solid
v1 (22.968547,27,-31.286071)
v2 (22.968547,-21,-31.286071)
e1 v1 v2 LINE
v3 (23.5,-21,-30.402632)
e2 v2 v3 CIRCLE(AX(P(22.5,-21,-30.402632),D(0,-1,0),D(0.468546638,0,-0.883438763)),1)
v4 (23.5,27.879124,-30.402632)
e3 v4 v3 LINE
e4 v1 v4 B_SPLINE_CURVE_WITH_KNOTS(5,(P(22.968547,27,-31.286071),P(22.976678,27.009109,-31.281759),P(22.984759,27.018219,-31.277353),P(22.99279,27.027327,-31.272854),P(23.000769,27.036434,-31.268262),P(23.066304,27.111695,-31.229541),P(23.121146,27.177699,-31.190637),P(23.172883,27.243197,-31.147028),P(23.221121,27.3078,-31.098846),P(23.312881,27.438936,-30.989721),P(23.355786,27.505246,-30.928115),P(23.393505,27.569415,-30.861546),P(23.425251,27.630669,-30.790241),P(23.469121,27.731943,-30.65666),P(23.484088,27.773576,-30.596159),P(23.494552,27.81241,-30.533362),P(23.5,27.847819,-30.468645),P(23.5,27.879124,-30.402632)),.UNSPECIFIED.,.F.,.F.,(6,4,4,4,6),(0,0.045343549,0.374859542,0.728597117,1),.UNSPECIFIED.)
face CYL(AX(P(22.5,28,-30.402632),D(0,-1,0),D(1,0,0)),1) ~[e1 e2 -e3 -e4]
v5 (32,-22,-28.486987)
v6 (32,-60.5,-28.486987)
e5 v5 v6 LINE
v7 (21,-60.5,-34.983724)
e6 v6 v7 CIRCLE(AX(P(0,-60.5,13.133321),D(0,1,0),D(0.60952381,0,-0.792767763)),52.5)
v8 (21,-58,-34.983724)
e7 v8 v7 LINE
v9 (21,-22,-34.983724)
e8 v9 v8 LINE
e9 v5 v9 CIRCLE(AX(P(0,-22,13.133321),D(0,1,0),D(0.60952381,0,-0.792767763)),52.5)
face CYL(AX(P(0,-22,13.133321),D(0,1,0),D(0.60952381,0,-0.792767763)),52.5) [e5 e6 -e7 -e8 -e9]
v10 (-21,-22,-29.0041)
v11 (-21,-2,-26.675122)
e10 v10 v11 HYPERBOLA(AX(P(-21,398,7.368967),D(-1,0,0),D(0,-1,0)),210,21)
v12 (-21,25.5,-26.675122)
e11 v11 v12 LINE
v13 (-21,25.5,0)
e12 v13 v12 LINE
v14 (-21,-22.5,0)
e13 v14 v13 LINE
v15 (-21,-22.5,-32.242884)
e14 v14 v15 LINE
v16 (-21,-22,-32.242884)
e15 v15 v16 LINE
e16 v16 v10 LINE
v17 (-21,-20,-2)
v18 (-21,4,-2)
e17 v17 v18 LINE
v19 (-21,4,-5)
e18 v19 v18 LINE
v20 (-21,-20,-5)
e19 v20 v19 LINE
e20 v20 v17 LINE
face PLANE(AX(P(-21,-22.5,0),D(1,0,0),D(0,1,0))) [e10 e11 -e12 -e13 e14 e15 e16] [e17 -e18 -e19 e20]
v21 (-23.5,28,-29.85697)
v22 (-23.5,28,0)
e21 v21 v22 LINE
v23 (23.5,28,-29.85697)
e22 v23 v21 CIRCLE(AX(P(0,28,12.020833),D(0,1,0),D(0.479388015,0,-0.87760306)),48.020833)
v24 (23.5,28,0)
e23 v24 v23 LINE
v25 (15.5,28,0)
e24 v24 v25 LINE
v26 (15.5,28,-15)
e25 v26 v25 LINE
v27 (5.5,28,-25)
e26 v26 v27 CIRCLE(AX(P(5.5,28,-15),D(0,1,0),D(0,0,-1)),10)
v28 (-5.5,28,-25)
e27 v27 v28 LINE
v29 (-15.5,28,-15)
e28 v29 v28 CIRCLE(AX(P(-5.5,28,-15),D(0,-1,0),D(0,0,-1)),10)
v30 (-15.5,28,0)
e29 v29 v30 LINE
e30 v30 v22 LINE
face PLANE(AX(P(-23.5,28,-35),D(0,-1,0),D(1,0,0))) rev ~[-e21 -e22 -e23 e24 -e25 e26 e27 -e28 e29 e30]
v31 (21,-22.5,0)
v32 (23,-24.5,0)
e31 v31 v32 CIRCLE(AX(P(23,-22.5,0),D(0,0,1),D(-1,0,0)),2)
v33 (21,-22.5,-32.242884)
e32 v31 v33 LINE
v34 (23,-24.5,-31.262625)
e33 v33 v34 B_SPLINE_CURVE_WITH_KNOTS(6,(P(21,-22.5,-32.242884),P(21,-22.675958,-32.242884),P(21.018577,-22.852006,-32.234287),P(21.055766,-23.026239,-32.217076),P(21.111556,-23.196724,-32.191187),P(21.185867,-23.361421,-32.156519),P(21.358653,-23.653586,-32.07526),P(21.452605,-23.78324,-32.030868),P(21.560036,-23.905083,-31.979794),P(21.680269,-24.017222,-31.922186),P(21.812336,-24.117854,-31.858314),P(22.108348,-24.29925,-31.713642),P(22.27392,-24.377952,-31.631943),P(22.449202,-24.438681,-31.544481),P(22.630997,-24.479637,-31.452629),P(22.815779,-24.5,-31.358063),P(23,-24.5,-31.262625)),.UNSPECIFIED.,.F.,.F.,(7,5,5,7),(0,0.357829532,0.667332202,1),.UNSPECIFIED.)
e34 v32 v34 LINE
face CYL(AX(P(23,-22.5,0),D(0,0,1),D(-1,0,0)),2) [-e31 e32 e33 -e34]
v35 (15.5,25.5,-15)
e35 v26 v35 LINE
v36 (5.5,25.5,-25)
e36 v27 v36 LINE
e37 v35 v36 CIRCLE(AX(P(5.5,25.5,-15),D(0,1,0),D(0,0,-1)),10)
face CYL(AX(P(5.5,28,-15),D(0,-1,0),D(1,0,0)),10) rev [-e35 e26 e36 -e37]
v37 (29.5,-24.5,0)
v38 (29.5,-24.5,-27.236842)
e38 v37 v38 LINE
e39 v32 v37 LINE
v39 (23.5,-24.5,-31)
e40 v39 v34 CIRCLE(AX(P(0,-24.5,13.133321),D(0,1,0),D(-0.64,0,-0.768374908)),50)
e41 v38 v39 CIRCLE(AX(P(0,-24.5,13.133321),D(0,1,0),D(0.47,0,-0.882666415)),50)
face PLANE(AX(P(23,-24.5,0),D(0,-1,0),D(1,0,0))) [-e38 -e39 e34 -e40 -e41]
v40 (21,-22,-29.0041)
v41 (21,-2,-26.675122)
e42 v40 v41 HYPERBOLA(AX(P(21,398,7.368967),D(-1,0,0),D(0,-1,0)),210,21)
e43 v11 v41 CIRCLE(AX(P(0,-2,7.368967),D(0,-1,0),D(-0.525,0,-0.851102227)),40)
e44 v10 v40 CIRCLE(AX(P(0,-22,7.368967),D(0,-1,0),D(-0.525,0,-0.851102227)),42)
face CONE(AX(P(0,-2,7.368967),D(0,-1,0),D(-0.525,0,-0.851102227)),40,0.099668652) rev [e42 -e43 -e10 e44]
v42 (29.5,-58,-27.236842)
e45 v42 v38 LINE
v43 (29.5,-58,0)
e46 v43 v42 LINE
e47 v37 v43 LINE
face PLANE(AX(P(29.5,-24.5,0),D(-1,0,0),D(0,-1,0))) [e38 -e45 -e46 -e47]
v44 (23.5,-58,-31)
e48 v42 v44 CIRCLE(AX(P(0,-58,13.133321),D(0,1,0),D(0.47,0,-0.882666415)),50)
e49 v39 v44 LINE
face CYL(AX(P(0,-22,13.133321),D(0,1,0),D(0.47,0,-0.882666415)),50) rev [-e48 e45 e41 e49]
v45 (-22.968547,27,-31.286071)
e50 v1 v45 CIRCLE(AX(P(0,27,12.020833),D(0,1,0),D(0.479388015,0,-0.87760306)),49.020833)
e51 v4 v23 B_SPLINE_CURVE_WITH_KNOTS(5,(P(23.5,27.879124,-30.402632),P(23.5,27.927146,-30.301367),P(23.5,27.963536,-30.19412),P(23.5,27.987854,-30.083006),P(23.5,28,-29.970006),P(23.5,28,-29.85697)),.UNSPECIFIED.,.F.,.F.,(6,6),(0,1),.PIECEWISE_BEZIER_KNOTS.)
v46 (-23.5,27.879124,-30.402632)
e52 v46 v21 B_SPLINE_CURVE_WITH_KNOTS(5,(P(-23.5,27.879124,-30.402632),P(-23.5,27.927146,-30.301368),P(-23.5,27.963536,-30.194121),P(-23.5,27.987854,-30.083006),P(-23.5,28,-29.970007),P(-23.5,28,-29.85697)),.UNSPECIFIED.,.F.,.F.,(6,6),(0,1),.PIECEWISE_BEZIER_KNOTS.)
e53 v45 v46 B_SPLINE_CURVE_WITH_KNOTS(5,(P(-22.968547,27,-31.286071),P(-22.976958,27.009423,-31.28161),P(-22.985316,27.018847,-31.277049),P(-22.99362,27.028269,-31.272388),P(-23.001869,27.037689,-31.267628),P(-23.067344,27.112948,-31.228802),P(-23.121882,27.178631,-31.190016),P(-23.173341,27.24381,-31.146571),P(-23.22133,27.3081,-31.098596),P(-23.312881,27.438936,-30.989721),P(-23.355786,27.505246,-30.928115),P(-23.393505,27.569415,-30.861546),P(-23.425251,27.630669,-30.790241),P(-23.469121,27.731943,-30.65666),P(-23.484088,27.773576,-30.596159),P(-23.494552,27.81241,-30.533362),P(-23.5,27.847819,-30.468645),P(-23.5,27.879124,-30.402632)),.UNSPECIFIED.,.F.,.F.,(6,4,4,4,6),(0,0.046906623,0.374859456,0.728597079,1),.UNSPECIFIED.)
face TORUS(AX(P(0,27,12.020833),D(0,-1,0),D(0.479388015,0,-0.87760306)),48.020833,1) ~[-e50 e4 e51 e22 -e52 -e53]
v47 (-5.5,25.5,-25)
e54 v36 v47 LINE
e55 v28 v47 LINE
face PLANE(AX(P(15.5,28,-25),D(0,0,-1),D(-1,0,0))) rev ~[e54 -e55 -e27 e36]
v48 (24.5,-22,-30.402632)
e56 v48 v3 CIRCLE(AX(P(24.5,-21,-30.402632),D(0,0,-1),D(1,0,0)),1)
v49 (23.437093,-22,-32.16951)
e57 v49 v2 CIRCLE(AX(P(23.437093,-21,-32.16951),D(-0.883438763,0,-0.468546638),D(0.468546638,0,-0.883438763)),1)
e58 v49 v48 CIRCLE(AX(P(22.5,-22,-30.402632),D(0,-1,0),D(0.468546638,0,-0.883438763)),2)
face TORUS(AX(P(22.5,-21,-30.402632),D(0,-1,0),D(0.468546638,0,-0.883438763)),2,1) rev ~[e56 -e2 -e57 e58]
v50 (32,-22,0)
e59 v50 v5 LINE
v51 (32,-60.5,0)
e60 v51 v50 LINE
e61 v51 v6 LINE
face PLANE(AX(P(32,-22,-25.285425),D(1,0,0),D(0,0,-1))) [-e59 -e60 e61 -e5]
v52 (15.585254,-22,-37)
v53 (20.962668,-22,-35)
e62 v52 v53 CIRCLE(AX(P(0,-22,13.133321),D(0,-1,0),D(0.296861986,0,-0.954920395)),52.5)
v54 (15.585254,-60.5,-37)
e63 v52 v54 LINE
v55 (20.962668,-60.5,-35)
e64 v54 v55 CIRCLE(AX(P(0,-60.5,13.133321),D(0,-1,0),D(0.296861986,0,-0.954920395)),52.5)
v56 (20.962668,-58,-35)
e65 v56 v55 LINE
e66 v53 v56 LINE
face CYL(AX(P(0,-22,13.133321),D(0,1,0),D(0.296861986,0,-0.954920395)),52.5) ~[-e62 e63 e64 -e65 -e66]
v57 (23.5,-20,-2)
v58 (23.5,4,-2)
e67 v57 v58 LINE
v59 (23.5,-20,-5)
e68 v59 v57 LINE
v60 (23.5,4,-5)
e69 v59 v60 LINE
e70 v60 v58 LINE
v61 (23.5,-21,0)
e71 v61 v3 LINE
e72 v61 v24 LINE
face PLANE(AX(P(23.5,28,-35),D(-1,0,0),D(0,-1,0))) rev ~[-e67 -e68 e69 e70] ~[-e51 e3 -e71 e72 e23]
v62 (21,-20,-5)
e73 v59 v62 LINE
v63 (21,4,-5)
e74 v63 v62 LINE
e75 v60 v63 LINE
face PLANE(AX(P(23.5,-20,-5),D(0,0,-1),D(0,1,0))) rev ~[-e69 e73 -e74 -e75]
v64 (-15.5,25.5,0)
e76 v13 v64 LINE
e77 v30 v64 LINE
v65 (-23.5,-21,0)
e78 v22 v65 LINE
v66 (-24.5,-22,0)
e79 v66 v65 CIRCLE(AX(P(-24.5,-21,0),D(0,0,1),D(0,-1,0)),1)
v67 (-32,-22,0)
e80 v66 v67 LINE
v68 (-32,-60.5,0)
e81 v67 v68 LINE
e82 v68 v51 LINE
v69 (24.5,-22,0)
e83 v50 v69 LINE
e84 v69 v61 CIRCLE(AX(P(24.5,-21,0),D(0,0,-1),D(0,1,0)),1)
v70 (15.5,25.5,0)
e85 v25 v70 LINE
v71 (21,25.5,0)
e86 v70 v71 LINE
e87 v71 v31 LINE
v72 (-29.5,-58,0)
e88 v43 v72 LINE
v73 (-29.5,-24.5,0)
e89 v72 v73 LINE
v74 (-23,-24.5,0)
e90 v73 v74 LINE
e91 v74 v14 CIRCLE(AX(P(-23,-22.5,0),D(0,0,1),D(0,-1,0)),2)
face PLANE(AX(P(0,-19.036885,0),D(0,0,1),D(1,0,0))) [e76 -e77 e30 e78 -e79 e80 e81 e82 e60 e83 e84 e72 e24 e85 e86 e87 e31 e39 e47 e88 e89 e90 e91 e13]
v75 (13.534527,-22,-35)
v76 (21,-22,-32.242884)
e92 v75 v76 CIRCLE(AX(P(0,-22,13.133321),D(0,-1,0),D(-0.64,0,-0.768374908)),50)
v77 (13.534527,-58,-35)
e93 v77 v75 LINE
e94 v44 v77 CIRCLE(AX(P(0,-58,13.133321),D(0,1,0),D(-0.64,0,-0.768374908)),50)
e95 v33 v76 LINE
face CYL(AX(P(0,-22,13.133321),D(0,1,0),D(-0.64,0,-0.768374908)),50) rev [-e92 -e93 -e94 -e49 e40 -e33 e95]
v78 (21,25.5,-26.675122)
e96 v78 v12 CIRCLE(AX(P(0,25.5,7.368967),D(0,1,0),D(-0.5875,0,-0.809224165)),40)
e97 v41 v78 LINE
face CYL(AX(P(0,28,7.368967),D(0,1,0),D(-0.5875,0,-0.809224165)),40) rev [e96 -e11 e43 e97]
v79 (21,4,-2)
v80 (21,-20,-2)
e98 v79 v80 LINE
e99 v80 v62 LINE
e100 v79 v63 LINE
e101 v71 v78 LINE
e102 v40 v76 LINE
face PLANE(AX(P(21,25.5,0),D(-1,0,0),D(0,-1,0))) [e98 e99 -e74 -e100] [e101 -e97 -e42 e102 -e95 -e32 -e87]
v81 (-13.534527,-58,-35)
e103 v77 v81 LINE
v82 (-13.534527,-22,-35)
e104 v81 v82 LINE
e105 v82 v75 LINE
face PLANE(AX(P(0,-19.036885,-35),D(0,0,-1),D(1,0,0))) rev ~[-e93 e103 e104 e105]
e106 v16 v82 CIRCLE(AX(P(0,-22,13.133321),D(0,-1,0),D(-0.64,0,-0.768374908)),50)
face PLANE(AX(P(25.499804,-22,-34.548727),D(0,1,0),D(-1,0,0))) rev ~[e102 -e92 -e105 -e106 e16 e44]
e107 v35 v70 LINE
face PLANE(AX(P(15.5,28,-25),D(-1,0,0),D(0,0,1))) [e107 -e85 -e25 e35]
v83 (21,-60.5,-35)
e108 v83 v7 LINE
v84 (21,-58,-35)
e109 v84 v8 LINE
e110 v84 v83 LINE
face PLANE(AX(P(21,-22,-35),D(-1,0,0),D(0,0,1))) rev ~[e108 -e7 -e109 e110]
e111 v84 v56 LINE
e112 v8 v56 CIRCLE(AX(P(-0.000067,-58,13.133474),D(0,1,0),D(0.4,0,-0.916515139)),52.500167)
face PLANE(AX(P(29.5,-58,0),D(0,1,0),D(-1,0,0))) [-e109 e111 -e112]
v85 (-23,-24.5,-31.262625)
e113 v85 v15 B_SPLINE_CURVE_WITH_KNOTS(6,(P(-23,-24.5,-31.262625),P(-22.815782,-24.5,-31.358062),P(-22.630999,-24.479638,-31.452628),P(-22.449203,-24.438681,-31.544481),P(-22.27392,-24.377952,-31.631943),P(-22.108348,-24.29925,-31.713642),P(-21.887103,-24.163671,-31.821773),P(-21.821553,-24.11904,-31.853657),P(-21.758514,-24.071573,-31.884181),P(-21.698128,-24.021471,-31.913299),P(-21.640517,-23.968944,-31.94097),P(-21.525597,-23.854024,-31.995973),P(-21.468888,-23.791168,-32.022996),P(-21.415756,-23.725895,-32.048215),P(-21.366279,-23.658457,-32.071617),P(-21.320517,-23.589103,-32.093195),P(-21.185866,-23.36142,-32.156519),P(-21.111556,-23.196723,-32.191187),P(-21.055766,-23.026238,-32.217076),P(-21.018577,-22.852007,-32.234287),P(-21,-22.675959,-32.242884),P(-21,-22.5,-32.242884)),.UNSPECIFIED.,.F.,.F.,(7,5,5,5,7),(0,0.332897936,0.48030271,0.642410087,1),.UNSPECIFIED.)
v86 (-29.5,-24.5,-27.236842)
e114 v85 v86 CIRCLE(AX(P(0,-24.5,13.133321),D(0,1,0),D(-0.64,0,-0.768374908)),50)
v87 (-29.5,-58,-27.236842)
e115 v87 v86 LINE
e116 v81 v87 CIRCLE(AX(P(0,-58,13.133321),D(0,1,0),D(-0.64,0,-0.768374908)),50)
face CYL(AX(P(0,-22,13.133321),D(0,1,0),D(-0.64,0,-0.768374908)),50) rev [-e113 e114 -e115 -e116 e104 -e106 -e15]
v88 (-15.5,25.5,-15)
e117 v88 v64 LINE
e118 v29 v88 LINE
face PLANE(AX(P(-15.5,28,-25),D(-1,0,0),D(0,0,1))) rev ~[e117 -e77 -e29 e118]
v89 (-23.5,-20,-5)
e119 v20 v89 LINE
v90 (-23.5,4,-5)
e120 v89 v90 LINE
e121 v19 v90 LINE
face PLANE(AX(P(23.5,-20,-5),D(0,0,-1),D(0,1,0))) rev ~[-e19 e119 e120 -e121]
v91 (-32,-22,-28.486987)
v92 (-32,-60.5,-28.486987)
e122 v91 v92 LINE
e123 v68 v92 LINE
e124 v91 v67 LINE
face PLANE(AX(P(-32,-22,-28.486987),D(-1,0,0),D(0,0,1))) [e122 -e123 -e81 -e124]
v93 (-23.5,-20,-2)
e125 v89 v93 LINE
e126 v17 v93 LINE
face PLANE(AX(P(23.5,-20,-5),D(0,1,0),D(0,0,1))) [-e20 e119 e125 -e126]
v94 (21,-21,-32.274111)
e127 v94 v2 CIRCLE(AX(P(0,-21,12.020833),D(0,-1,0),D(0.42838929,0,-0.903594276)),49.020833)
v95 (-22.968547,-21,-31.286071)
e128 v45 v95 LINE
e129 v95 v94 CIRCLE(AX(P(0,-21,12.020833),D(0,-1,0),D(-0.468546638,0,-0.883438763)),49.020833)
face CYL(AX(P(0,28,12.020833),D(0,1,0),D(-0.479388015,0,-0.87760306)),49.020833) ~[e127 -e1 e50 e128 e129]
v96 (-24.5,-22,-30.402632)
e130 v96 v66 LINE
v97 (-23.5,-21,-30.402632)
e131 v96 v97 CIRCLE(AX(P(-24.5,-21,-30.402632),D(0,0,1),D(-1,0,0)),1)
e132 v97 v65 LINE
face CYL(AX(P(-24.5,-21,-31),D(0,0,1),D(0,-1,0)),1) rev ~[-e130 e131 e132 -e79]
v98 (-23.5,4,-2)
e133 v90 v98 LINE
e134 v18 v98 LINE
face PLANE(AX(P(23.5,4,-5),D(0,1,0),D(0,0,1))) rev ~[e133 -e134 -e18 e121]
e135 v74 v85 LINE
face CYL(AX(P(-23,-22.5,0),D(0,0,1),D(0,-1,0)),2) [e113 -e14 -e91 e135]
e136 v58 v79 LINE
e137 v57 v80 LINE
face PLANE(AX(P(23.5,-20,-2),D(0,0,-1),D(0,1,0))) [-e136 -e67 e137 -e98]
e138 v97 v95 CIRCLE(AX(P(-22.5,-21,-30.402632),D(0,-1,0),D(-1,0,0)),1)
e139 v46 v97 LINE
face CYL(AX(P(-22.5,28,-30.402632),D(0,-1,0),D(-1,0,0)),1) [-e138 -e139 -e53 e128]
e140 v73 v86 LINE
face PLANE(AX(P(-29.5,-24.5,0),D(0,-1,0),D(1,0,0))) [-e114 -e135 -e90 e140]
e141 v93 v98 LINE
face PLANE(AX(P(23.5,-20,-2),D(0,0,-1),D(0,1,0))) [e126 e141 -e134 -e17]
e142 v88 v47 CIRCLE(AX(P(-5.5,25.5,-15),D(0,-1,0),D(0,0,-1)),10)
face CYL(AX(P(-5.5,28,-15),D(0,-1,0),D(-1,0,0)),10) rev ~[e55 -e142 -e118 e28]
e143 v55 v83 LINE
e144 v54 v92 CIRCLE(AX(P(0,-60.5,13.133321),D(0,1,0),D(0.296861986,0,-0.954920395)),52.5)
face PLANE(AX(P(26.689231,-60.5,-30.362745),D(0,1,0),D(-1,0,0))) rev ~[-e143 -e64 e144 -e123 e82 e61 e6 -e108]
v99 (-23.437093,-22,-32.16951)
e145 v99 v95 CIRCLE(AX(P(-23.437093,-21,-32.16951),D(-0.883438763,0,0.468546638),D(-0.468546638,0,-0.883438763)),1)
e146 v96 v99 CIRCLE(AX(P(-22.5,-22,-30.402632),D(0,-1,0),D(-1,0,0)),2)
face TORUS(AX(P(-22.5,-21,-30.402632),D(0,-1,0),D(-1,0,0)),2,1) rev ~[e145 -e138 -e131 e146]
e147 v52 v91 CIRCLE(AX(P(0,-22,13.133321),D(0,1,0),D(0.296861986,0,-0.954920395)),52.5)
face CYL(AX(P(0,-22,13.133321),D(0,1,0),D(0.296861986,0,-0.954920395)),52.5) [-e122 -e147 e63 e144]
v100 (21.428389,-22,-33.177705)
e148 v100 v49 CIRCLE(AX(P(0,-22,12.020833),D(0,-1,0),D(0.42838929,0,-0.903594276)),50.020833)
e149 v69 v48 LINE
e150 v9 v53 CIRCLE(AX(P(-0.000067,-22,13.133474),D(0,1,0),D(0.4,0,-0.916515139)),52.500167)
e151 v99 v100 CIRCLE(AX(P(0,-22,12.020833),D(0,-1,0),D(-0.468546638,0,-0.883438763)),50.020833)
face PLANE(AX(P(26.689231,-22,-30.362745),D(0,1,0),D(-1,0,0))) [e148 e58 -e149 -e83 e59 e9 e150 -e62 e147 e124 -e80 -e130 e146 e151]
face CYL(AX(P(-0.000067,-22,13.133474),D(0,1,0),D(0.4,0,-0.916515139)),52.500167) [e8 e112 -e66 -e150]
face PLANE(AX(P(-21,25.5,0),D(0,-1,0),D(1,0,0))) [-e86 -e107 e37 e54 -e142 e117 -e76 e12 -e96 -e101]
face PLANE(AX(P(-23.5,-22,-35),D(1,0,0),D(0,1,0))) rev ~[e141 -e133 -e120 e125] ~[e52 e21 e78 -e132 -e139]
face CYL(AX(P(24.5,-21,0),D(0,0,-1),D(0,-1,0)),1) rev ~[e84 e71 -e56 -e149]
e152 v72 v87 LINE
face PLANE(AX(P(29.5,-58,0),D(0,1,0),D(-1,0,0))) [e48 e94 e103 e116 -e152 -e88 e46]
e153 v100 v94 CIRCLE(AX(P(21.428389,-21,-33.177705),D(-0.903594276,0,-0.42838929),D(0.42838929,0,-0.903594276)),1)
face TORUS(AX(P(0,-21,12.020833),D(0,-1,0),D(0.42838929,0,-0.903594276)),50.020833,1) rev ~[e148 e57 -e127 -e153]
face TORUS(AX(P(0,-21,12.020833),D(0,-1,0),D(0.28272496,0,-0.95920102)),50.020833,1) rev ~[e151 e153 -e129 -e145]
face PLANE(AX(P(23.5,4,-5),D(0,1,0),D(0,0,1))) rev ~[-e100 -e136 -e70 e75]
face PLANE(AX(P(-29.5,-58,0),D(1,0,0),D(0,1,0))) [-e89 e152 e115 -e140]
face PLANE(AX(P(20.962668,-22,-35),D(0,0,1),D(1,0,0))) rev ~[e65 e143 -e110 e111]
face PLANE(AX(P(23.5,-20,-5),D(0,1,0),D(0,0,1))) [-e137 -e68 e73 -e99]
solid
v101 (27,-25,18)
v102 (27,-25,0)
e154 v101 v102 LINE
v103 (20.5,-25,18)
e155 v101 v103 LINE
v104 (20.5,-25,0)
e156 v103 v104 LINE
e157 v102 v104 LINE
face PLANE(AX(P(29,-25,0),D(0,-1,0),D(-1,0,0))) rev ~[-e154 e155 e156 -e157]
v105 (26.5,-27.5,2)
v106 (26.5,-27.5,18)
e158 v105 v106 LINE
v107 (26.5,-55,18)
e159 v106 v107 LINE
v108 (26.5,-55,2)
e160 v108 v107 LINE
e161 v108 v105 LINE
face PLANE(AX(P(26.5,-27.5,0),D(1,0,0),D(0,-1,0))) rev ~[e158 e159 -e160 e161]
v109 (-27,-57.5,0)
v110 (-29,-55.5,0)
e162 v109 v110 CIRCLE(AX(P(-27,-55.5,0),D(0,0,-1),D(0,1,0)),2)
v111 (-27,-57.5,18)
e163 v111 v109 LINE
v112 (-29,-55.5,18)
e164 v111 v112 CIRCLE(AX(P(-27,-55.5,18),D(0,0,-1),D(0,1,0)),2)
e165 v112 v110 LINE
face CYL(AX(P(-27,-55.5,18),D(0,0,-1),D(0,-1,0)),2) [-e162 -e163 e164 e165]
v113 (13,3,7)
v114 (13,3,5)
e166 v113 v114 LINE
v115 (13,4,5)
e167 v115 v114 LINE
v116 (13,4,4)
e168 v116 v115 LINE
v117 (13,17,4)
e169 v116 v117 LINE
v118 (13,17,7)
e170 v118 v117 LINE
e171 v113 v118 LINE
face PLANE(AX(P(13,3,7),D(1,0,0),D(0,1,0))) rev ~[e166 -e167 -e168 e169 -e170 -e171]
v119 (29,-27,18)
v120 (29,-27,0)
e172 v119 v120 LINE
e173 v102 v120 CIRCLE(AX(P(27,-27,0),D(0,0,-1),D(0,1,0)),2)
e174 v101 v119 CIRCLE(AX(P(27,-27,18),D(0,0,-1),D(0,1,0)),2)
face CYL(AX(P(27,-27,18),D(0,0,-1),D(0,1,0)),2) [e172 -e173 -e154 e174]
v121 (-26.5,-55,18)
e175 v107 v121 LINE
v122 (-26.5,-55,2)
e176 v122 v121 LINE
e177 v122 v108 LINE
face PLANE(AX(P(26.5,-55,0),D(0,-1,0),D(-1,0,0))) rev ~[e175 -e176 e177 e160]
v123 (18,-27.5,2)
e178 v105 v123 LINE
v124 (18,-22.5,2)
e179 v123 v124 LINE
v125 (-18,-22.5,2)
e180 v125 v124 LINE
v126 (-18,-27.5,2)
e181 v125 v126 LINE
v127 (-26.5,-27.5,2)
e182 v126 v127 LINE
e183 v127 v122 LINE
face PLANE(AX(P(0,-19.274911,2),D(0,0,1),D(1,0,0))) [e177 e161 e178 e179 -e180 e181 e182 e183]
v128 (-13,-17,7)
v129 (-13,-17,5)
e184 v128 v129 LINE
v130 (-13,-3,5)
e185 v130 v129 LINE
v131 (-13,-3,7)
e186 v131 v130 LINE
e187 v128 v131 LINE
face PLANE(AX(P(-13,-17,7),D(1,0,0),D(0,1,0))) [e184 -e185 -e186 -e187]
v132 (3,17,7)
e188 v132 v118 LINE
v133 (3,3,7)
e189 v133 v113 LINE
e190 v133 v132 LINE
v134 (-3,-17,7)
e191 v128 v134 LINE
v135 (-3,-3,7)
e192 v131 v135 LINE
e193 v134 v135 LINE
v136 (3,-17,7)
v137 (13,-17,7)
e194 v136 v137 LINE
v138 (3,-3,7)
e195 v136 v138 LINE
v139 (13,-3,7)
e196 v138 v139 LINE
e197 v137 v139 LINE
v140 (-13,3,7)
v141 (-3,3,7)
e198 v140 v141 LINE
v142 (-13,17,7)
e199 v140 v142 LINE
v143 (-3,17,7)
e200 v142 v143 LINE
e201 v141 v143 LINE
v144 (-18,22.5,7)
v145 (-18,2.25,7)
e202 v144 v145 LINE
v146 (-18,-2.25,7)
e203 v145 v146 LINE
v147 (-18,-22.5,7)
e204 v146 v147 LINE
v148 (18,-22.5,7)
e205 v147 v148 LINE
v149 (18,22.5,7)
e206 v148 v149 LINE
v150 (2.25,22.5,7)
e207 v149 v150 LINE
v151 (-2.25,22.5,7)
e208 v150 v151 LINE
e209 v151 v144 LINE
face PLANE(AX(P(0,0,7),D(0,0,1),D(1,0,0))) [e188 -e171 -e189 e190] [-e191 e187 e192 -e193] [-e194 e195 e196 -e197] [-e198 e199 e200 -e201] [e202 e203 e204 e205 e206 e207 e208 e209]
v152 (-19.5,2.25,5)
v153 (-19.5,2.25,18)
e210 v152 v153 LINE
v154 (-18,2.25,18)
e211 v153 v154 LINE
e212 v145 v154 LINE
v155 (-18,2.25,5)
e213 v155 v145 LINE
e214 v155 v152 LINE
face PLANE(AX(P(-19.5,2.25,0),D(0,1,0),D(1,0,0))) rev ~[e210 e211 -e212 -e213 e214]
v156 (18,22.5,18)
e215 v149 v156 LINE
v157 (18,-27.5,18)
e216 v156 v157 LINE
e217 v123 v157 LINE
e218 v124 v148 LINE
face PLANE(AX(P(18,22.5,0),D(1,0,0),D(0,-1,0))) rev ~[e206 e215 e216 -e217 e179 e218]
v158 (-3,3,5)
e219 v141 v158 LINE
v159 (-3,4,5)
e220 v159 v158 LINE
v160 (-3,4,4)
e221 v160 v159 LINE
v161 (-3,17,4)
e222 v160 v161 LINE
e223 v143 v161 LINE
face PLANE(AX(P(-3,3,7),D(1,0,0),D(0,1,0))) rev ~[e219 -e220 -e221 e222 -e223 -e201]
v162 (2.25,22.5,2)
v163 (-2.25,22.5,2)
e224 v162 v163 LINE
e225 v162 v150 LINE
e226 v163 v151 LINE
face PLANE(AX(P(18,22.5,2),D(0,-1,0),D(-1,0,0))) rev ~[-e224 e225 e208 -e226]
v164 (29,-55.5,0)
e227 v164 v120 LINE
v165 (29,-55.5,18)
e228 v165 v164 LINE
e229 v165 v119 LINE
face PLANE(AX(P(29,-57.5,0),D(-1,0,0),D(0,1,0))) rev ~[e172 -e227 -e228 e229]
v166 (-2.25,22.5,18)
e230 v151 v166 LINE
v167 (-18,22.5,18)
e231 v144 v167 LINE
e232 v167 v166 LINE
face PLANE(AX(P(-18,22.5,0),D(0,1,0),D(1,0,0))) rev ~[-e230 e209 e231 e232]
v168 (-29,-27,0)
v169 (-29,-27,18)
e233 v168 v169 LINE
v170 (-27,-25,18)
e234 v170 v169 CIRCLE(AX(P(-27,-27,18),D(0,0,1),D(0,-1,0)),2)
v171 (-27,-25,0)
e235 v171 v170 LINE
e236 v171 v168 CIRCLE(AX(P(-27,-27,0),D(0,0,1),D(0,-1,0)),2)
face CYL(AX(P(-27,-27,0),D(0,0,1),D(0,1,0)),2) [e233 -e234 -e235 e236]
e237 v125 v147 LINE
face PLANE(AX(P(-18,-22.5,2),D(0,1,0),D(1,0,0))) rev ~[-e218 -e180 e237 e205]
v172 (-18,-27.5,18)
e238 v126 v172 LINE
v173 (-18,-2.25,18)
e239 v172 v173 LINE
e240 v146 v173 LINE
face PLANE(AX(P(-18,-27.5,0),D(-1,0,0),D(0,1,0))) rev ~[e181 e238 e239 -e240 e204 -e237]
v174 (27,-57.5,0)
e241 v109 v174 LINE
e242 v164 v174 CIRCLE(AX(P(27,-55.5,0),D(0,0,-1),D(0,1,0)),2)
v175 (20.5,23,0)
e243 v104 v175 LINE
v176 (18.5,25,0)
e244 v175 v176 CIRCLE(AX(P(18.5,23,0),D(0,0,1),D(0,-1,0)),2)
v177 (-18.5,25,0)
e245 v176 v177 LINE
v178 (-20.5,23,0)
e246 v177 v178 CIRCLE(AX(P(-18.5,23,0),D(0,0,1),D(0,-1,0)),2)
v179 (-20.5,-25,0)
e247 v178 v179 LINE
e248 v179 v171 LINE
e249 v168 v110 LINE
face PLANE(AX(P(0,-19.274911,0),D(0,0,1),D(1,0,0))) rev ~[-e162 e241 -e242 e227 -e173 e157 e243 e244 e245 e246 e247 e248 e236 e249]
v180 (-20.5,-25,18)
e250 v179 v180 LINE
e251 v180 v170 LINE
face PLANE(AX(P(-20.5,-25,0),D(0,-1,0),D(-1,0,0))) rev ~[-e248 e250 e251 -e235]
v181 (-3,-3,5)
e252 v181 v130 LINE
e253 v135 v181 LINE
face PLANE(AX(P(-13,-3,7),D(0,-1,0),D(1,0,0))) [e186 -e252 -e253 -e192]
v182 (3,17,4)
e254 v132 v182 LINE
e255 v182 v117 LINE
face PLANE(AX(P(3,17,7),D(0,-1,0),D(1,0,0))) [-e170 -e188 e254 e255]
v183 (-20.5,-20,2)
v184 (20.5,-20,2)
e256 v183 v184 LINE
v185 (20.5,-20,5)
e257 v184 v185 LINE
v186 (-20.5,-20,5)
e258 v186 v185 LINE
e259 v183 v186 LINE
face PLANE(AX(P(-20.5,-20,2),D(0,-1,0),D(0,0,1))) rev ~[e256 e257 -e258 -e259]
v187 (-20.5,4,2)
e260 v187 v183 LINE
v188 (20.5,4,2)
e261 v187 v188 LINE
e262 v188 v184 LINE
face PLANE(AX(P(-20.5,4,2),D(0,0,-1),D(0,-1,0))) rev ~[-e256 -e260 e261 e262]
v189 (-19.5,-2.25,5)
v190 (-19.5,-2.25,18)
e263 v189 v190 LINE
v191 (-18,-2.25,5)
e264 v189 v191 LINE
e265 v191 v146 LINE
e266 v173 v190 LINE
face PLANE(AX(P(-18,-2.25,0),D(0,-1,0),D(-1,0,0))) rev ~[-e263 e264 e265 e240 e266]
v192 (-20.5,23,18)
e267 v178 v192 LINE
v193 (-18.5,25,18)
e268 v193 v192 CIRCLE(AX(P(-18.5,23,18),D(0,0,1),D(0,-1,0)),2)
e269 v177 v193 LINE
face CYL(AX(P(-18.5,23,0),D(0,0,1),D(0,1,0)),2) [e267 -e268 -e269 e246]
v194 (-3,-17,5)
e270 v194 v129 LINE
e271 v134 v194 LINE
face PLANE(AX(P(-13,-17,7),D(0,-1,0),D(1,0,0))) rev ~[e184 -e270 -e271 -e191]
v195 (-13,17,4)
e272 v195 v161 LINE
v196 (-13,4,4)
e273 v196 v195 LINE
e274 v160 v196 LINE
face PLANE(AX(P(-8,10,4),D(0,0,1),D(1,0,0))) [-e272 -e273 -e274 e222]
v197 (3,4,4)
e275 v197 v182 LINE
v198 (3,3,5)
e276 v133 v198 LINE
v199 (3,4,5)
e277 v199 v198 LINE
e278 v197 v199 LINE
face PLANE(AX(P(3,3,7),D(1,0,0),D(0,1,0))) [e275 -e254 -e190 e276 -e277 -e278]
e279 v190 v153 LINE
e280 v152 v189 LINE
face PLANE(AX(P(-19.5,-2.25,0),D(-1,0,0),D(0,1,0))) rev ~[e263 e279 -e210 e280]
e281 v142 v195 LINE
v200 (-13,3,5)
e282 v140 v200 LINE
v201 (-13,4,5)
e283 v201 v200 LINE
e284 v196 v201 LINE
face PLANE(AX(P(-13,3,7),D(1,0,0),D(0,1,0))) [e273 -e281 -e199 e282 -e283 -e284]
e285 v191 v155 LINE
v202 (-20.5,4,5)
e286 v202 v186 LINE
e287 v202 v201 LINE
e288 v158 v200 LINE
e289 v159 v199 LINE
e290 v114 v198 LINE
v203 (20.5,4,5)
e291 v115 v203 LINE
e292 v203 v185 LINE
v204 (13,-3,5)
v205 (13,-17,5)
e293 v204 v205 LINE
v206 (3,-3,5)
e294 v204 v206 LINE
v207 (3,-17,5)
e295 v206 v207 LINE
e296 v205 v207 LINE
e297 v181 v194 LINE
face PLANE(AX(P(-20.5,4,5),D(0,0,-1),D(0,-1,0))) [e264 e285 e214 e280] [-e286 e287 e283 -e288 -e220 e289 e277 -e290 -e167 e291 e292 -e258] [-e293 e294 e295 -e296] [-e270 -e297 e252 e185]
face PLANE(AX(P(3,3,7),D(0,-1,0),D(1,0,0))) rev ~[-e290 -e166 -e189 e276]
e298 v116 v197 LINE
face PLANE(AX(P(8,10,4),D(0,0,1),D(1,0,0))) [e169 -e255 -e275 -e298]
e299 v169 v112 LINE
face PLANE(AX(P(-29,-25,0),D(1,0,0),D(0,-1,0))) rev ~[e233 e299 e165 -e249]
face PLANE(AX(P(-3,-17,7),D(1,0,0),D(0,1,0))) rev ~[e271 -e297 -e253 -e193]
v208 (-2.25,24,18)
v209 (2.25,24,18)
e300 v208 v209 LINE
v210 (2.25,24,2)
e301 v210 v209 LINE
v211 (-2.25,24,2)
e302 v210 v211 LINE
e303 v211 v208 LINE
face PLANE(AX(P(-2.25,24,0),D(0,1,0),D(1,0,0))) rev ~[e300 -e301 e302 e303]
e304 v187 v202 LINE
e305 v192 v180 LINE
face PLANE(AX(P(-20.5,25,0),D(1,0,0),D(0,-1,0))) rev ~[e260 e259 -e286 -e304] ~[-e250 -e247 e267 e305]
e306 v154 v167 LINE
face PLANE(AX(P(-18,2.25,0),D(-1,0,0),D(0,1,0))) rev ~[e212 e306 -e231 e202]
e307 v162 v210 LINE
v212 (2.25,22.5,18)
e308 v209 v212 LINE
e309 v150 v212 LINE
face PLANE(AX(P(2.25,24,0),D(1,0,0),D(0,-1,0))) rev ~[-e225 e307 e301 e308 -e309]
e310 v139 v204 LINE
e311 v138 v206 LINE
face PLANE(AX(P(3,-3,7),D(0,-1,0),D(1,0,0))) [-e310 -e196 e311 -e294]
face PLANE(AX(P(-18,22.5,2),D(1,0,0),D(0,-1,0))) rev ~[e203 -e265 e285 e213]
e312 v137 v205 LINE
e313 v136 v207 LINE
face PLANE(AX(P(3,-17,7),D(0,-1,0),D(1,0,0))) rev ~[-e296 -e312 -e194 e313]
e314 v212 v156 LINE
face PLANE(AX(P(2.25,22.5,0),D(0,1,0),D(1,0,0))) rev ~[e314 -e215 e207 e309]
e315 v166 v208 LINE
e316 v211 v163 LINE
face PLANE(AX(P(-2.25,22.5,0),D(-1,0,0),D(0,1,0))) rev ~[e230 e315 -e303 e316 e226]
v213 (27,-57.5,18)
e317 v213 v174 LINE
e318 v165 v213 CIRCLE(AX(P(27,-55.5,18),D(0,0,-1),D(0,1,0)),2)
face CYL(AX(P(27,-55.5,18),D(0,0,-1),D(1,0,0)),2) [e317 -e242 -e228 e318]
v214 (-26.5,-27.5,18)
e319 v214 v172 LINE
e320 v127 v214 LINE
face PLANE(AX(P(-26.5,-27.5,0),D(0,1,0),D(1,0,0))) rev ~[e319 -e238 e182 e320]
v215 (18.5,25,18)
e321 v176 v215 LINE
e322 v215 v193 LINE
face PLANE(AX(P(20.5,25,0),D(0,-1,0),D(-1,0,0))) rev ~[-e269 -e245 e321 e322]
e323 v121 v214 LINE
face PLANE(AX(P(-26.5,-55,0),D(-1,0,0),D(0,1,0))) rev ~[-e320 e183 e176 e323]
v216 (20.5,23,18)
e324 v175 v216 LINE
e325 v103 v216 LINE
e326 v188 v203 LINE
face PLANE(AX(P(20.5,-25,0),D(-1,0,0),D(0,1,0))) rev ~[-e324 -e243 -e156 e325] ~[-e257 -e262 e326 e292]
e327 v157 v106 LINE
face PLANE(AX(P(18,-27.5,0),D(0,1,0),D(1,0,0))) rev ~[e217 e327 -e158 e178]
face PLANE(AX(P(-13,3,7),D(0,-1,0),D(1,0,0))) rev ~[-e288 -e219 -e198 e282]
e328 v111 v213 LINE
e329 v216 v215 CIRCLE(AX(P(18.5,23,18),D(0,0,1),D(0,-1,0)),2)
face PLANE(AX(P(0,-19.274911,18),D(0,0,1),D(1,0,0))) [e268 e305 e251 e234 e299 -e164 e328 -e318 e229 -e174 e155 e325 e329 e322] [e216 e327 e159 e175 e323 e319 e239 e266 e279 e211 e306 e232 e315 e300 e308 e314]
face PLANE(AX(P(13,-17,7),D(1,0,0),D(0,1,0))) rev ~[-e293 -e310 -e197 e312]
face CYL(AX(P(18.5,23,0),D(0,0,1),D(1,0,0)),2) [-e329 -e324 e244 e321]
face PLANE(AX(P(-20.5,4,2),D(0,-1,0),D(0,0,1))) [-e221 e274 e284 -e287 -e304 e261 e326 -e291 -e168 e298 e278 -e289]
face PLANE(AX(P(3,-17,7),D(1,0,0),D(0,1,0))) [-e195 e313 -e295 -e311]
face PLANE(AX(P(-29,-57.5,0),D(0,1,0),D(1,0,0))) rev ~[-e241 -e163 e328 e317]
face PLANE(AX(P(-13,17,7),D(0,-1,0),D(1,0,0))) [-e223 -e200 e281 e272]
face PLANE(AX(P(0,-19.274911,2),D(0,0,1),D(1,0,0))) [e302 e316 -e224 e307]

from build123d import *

# Parameters (mm, degrees)
F1_DEPTH  = 2
F2_DEPTH  = 18
F4_DEPTH  = 5
F5_W      = 24
F5_H      = 3
F6_DEPTH  = 41
F7_W      = 10
F7_H      = 14
F8_DEPTH  = 3
F9_DEPTH  = 35
F11_DEPTH = 2
F12_R     = 2
F13_W     = 31
F13_H     = 25
F14_DEPTH = 2.5
F15_R     = 10
F17_DEPTH = 50
F18_DEPTH = 50
F20_DEPTH = 38.5
F21_DEPTH = 38.5
F22_R     = 1
F23_W     = 24
F23_H     = 3
F24_DEPTH = 47
F25_SIZE2 = 20
F25_SIZE  = 2


with BuildPart() as f1:
    # F0 (on Top) → F1 (new body)
    with BuildSketch(Plane.XY):
        Polygon((20.5, -25), (20.5, 25), (-20.5, 25), (-20.5, -25), (-29, -25), (-29, -57.5), (29, -57.5), (29, -25), align=None)
        Polygon((2.25, 22.5), (18, 22.5), (18, -27.5), (26.5, -27.5), (26.5, -55), (-26.5, -55), (-26.5, -27.5), (-18, -27.5), (-18, -2.25), (-19.5, -2.25), (-19.5, 2.25), (-18, 2.25), (-18, 22.5), (-2.25, 22.5), (-2.25, 24), (2.25, 24), align=None, mode=Mode.SUBTRACT)
        Polygon((18, -27.5), (18, 22.5), (2.25, 22.5), (2.25, 24), (-2.25, 24), (-2.25, 22.5), (-18, 22.5), (-18, 2.25), (-19.5, 2.25), (-19.5, -2.25), (-18, -2.25), (-18, -27.5), (-26.5, -27.5), (-26.5, -55), (26.5, -55), (26.5, -27.5), align=None)
    extrude(amount=F1_DEPTH)

    # F0 (on Top) → F2 (join)
    with BuildSketch(Plane.XY):
        Polygon((20.5, -25), (20.5, 25), (-20.5, 25), (-20.5, -25), (-29, -25), (-29, -57.5), (29, -57.5), (29, -25), align=None)
        Polygon((2.25, 22.5), (18, 22.5), (18, -27.5), (26.5, -27.5), (26.5, -55), (-26.5, -55), (-26.5, -27.5), (-18, -27.5), (-18, -2.25), (-19.5, -2.25), (-19.5, 2.25), (-18, 2.25), (-18, 22.5), (-2.25, 22.5), (-2.25, 24), (2.25, 24), align=None, mode=Mode.SUBTRACT)
    extrude(amount=F2_DEPTH)

    # F3 (on face) → F4 (join)
    with BuildSketch(Plane.XY.offset(2)):
        Polygon((18, -22.5), (18, 22.5), (2.25, 22.5), (-2.25, 22.5), (-18, 22.5), (-18, 2.25), (-18, -2.25), (-18, -22.5), align=None)
    extrude(amount=F4_DEPTH)

    # F5 (on face) → F6 (cut, through all)
    with BuildSketch(Plane(origin=(-20.5, 0, 0), x_dir=(0, -1, 0), z_dir=(-1, 0, 0))):
        with Locations((8, 3.5)):
            Rectangle(F5_W, F5_H)
    extrude(amount=-F6_DEPTH, mode=Mode.SUBTRACT)

    # F7 (on face) → F8 (cut)
    with BuildSketch(Plane.XY.offset(7)):
        with Locations((-8, 10)):
            Rectangle(F7_W, F7_H)
        with Locations((8, 10)):
            Rectangle(F7_W, F7_H)
        with Locations((-8, -10)):
            Rectangle(F7_W, F7_H)
        with Locations((8, -10)):
            Rectangle(F7_W, F7_H)
    extrude(amount=-F8_DEPTH, mode=Mode.SUBTRACT)

    # F12
    f12_edges = [f1.edges().sort_by_distance(p)[0] for p in [
        (-29, -57.5, 9),
        (-29, -25, 9),
        (29, -57.5, 9),
        (-20.5, 25, 9),
        (29, -25, 9),
        (20.5, 25, 9),
    ]]
    fillet(f12_edges, radius=F12_R)


with BuildPart() as f9:
    # F0 (on Top) → F9 (new body)
    with BuildSketch(Plane.XY):
        Polygon((-23.5, -22), (-32, -22), (-32, -60.5), (32, -60.5), (32, -22), (23.5, -22), (23.5, 28), (-23.5, 28), align=None)
        with BuildLine():
            Line((-29.5, -58), (-29.5, -24.5))
            Line((-29.5, -24.5), (-23, -24.5))
            ThreePointArc((-23, -24.5), (-21.5857864376, -23.9142135624), (-21, -22.5))
            Line((-21, -22.5), (-21, 25.5))
            Line((-21, 25.5), (21, 25.5))
            Line((21, 25.5), (21, -22.5))
            ThreePointArc((21, -22.5), (21.5857864376, -23.9142135624), (23, -24.5))
            Line((23, -24.5), (29.5, -24.5))
            Line((29.5, -24.5), (29.5, -58))
            Line((29.5, -58), (-29.5, -58))
        make_face(mode=Mode.SUBTRACT)
    extrude(amount=-F9_DEPTH)

    # F10 (on face) → F11 (join)
    with BuildSketch(Plane(origin=(0, 0, -35), x_dir=(1, 0, 0), z_dir=(0, 0, -1))):
        Polygon((32, 60.5), (-32, 60.5), (-32, 22), (-23.5, 22), (-23.5, -28), (23.5, -28), (23.5, 22), (32, 22), align=None)
    extrude(amount=F11_DEPTH)

    # F13 (on face) → F14 (cut, through all)
    with BuildSketch(Plane(origin=(0, 28, 0), x_dir=(-1, 0, 0), z_dir=(0, 1, 0))):
        with Locations((0, -12.5)):
            Rectangle(F13_W, F13_H)
    extrude(amount=-F14_DEPTH, mode=Mode.SUBTRACT)

    # F15
    f15_edges = [f9.edges().sort_by_distance(p)[0] for p in [
        (15.5, 26.75, -25),
        (-15.5, 26.75, -25),
    ]]
    fillet(f15_edges, radius=F15_R)

    # F16 (on face) → F17 (cut, through all)
    with BuildSketch(Plane(origin=(0, 28, 0), x_dir=(-1, 0, 0), z_dir=(0, 1, 0))):
        with BuildLine():
            Line((23.5, -37), (1.547e-07, -37))
            Line((1.547e-07, -37), (-23.5, -37))
            Line((-23.5, -37), (-23.5, -37.7059200294))
            ThreePointArc((-23.5, -37.7059200294), (0, -42.9791666667), (23.5, -37.7059200294))
            Line((23.5, -37.7059200294), (23.5, -37))
        make_face()
        with BuildLine():
            ThreePointArc((1.547e-07, -37), (-12.1269327607, -35.476320292), (-23.5, -31))
            Line((-23.5, -31), (-23.5, -37))
            Line((-23.5, -37), (1.547e-07, -37))
        make_face()
        with BuildLine():
            Line((23.5, -37), (23.5, -31))
            ThreePointArc((23.5, -31), (12.1269329106, -35.4763202538), (1.547e-07, -37))
            Line((1.547e-07, -37), (23.5, -37))
        make_face()
    extrude(amount=-F17_DEPTH, mode=Mode.SUBTRACT)

    # F16 (on face) → F18 (join, through all)
    with BuildSketch(Plane(origin=(0, 28, 0), x_dir=(-1, 0, 0), z_dir=(0, 1, 0))):
        with BuildLine():
            ThreePointArc((23.5, -25), (0, -32.6310333807), (-23.5, -25))
            Line((-23.5, -25), (-23.5, -31))
            ThreePointArc((-23.5, -31), (-12.1269327607, -35.476320292), (1.547e-07, -37))
            ThreePointArc((1.547e-07, -37), (12.1269329106, -35.4763202538), (23.5, -31))
            Line((23.5, -31), (23.5, -25))
        make_face()
    extrude(amount=-F18_DEPTH)

    # F19 (on face) → F20 (cut, through all)
    with BuildSketch(Plane(origin=(0, -22, 0), x_dir=(-1, 0, 0), z_dir=(0, 1, 0))):
        with BuildLine():
            ThreePointArc((-21, -34.9837240518), (-26.6983501126, -32.0711934239), (-32, -28.4869867981))
            Line((-32, -28.4869867981), (-32, -37))
            Line((-32, -37), (-15.5852542827, -37))
            ThreePointArc((-15.5852542827, -37), (-18.3013018384, -36.073511616), (-20.962667627, -35))
            Line((-20.962667627, -35), (-21, -35))
            Line((-21, -35), (-21, -34.9837240518))
        make_face()
        with BuildLine():
            Line((-15.5852542827, -37), (-32, -37))
            Line((-32, -37), (-32, -37.6209894166))
            ThreePointArc((-32, -37.6209894166), (0, -46.8666792548), (32, -37.6209894166))
            Line((32, -37.6209894166), (32, -28.4869867981))
            ThreePointArc((32, -28.4869867981), (9.2454755251, -38.5461837253), (-15.5852542827, -37))
        make_face()
        with BuildLine():
            ThreePointArc((-23.5, -31), (-27.8967129385, -28.3609367759), (-32, -25.2854246794))
            Line((-32, -25.2854246794), (-32, -28.4869867981))
            ThreePointArc((-32, -28.4869867981), (-26.6983501126, -32.0711934239), (-21, -34.9837240518))
            Line((-21, -34.9837240518), (-21, -32.2741110813))
            ThreePointArc((-21, -32.2741110813), (-22.2591181263, -31.6549466933), (-23.5, -31))
        make_face()
        with BuildLine():
            ThreePointArc((32, -25.2854246794), (5.1211905621, -36.6037218611), (-23.5, -31))
            ThreePointArc((-23.5, -31), (-22.2591181263, -31.6549466933), (-21, -32.2741110813))
            Line((-21, -32.2741110813), (-21, -34.9837240518))
            ThreePointArc((-21, -34.9837240518), (-20.9813353917, -34.9918656459), (-20.962667627, -35))
            Line((-20.962667627, -35), (-13.859413167, -35))
            ThreePointArc((-13.859413167, -35), (-7.0014879371, -36.4974237186), (0, -37))
            Line((0, -37), (-15.5852542827, -37))
            ThreePointArc((-15.5852542827, -37), (9.2454755251, -38.5461837253), (32, -28.4869867981))
            Line((32, -28.4869867981), (32, -25.2854246794))
        make_face()
    extrude(amount=-F20_DEPTH, mode=Mode.SUBTRACT)

    # F19 (on face) → F21 (join, through all)
    with BuildSketch(Plane(origin=(0, -22, 0), x_dir=(-1, 0, 0), z_dir=(0, 1, 0))):
        with BuildLine():
            ThreePointArc((-23.5, -31), (-27.8967129385, -28.3609367759), (-32, -25.2854246794))
            Line((-32, -25.2854246794), (-32, -28.4869867981))
            ThreePointArc((-32, -28.4869867981), (-26.6983501126, -32.0711934239), (-21, -34.9837240518))
            Line((-21, -34.9837240518), (-21, -32.2741110813))
            ThreePointArc((-21, -32.2741110813), (-22.2591181263, -31.6549466933), (-23.5, -31))
        make_face()
        with BuildLine():
            Line((-13.859413167, -35), (-20.962667627, -35))
            ThreePointArc((-20.962667627, -35), (-18.3013018384, -36.073511616), (-15.5852542827, -37))
            Line((-15.5852542827, -37), (0, -37))
            ThreePointArc((0, -37), (-7.0014879371, -36.4974237186), (-13.859413167, -35))
        make_face()
        with BuildLine():
            ThreePointArc((32, -25.2854246794), (5.1211905621, -36.6037218611), (-23.5, -31))
            ThreePointArc((-23.5, -31), (-22.2591181263, -31.6549466933), (-21, -32.2741110813))
            Line((-21, -32.2741110813), (-21, -34.9837240518))
            ThreePointArc((-21, -34.9837240518), (-20.9813353917, -34.9918656459), (-20.962667627, -35))
            Line((-20.962667627, -35), (-13.859413167, -35))
            ThreePointArc((-13.859413167, -35), (-7.0014879371, -36.4974237186), (0, -37))
            Line((0, -37), (-15.5852542827, -37))
            ThreePointArc((-15.5852542827, -37), (9.2454755251, -38.5461837253), (32, -28.4869867981))
            Line((32, -28.4869867981), (32, -25.2854246794))
        make_face()
    extrude(amount=-F21_DEPTH)

    # F22
    f22_edges = [f9.edges().sort_by_distance(p)[0] for p in [
        (0, 28, -37),
        (23.5, 3, -31),
        (0, -22, -37),
        (-23.5, 3, -31),
        (-23.5, -22, -15.5),
        (23.5, -22, -15.5),
    ]]
    fillet(f22_edges, radius=F22_R)

    # F23 (on face) → F24 (cut, through all)
    with BuildSketch(Plane.YZ.offset(23.5)):
        with Locations((-8, -3.5)):
            Rectangle(F23_W, F23_H)
    extrude(amount=-F24_DEPTH, mode=Mode.SUBTRACT)

    # F25
    f25_edges = [f9.edges().sort_by_distance(p)[0] for p in [
        (0, -22, -32.631033),
    ]]
    f25_side = f9.faces().sort_by_distance((20.571829, -22, -29.459003))[0]
    chamfer(f25_edges, length=F25_SIZE, length2=F25_SIZE2, reference=f25_side)


solid = Compound([f1.part, f9.part])
